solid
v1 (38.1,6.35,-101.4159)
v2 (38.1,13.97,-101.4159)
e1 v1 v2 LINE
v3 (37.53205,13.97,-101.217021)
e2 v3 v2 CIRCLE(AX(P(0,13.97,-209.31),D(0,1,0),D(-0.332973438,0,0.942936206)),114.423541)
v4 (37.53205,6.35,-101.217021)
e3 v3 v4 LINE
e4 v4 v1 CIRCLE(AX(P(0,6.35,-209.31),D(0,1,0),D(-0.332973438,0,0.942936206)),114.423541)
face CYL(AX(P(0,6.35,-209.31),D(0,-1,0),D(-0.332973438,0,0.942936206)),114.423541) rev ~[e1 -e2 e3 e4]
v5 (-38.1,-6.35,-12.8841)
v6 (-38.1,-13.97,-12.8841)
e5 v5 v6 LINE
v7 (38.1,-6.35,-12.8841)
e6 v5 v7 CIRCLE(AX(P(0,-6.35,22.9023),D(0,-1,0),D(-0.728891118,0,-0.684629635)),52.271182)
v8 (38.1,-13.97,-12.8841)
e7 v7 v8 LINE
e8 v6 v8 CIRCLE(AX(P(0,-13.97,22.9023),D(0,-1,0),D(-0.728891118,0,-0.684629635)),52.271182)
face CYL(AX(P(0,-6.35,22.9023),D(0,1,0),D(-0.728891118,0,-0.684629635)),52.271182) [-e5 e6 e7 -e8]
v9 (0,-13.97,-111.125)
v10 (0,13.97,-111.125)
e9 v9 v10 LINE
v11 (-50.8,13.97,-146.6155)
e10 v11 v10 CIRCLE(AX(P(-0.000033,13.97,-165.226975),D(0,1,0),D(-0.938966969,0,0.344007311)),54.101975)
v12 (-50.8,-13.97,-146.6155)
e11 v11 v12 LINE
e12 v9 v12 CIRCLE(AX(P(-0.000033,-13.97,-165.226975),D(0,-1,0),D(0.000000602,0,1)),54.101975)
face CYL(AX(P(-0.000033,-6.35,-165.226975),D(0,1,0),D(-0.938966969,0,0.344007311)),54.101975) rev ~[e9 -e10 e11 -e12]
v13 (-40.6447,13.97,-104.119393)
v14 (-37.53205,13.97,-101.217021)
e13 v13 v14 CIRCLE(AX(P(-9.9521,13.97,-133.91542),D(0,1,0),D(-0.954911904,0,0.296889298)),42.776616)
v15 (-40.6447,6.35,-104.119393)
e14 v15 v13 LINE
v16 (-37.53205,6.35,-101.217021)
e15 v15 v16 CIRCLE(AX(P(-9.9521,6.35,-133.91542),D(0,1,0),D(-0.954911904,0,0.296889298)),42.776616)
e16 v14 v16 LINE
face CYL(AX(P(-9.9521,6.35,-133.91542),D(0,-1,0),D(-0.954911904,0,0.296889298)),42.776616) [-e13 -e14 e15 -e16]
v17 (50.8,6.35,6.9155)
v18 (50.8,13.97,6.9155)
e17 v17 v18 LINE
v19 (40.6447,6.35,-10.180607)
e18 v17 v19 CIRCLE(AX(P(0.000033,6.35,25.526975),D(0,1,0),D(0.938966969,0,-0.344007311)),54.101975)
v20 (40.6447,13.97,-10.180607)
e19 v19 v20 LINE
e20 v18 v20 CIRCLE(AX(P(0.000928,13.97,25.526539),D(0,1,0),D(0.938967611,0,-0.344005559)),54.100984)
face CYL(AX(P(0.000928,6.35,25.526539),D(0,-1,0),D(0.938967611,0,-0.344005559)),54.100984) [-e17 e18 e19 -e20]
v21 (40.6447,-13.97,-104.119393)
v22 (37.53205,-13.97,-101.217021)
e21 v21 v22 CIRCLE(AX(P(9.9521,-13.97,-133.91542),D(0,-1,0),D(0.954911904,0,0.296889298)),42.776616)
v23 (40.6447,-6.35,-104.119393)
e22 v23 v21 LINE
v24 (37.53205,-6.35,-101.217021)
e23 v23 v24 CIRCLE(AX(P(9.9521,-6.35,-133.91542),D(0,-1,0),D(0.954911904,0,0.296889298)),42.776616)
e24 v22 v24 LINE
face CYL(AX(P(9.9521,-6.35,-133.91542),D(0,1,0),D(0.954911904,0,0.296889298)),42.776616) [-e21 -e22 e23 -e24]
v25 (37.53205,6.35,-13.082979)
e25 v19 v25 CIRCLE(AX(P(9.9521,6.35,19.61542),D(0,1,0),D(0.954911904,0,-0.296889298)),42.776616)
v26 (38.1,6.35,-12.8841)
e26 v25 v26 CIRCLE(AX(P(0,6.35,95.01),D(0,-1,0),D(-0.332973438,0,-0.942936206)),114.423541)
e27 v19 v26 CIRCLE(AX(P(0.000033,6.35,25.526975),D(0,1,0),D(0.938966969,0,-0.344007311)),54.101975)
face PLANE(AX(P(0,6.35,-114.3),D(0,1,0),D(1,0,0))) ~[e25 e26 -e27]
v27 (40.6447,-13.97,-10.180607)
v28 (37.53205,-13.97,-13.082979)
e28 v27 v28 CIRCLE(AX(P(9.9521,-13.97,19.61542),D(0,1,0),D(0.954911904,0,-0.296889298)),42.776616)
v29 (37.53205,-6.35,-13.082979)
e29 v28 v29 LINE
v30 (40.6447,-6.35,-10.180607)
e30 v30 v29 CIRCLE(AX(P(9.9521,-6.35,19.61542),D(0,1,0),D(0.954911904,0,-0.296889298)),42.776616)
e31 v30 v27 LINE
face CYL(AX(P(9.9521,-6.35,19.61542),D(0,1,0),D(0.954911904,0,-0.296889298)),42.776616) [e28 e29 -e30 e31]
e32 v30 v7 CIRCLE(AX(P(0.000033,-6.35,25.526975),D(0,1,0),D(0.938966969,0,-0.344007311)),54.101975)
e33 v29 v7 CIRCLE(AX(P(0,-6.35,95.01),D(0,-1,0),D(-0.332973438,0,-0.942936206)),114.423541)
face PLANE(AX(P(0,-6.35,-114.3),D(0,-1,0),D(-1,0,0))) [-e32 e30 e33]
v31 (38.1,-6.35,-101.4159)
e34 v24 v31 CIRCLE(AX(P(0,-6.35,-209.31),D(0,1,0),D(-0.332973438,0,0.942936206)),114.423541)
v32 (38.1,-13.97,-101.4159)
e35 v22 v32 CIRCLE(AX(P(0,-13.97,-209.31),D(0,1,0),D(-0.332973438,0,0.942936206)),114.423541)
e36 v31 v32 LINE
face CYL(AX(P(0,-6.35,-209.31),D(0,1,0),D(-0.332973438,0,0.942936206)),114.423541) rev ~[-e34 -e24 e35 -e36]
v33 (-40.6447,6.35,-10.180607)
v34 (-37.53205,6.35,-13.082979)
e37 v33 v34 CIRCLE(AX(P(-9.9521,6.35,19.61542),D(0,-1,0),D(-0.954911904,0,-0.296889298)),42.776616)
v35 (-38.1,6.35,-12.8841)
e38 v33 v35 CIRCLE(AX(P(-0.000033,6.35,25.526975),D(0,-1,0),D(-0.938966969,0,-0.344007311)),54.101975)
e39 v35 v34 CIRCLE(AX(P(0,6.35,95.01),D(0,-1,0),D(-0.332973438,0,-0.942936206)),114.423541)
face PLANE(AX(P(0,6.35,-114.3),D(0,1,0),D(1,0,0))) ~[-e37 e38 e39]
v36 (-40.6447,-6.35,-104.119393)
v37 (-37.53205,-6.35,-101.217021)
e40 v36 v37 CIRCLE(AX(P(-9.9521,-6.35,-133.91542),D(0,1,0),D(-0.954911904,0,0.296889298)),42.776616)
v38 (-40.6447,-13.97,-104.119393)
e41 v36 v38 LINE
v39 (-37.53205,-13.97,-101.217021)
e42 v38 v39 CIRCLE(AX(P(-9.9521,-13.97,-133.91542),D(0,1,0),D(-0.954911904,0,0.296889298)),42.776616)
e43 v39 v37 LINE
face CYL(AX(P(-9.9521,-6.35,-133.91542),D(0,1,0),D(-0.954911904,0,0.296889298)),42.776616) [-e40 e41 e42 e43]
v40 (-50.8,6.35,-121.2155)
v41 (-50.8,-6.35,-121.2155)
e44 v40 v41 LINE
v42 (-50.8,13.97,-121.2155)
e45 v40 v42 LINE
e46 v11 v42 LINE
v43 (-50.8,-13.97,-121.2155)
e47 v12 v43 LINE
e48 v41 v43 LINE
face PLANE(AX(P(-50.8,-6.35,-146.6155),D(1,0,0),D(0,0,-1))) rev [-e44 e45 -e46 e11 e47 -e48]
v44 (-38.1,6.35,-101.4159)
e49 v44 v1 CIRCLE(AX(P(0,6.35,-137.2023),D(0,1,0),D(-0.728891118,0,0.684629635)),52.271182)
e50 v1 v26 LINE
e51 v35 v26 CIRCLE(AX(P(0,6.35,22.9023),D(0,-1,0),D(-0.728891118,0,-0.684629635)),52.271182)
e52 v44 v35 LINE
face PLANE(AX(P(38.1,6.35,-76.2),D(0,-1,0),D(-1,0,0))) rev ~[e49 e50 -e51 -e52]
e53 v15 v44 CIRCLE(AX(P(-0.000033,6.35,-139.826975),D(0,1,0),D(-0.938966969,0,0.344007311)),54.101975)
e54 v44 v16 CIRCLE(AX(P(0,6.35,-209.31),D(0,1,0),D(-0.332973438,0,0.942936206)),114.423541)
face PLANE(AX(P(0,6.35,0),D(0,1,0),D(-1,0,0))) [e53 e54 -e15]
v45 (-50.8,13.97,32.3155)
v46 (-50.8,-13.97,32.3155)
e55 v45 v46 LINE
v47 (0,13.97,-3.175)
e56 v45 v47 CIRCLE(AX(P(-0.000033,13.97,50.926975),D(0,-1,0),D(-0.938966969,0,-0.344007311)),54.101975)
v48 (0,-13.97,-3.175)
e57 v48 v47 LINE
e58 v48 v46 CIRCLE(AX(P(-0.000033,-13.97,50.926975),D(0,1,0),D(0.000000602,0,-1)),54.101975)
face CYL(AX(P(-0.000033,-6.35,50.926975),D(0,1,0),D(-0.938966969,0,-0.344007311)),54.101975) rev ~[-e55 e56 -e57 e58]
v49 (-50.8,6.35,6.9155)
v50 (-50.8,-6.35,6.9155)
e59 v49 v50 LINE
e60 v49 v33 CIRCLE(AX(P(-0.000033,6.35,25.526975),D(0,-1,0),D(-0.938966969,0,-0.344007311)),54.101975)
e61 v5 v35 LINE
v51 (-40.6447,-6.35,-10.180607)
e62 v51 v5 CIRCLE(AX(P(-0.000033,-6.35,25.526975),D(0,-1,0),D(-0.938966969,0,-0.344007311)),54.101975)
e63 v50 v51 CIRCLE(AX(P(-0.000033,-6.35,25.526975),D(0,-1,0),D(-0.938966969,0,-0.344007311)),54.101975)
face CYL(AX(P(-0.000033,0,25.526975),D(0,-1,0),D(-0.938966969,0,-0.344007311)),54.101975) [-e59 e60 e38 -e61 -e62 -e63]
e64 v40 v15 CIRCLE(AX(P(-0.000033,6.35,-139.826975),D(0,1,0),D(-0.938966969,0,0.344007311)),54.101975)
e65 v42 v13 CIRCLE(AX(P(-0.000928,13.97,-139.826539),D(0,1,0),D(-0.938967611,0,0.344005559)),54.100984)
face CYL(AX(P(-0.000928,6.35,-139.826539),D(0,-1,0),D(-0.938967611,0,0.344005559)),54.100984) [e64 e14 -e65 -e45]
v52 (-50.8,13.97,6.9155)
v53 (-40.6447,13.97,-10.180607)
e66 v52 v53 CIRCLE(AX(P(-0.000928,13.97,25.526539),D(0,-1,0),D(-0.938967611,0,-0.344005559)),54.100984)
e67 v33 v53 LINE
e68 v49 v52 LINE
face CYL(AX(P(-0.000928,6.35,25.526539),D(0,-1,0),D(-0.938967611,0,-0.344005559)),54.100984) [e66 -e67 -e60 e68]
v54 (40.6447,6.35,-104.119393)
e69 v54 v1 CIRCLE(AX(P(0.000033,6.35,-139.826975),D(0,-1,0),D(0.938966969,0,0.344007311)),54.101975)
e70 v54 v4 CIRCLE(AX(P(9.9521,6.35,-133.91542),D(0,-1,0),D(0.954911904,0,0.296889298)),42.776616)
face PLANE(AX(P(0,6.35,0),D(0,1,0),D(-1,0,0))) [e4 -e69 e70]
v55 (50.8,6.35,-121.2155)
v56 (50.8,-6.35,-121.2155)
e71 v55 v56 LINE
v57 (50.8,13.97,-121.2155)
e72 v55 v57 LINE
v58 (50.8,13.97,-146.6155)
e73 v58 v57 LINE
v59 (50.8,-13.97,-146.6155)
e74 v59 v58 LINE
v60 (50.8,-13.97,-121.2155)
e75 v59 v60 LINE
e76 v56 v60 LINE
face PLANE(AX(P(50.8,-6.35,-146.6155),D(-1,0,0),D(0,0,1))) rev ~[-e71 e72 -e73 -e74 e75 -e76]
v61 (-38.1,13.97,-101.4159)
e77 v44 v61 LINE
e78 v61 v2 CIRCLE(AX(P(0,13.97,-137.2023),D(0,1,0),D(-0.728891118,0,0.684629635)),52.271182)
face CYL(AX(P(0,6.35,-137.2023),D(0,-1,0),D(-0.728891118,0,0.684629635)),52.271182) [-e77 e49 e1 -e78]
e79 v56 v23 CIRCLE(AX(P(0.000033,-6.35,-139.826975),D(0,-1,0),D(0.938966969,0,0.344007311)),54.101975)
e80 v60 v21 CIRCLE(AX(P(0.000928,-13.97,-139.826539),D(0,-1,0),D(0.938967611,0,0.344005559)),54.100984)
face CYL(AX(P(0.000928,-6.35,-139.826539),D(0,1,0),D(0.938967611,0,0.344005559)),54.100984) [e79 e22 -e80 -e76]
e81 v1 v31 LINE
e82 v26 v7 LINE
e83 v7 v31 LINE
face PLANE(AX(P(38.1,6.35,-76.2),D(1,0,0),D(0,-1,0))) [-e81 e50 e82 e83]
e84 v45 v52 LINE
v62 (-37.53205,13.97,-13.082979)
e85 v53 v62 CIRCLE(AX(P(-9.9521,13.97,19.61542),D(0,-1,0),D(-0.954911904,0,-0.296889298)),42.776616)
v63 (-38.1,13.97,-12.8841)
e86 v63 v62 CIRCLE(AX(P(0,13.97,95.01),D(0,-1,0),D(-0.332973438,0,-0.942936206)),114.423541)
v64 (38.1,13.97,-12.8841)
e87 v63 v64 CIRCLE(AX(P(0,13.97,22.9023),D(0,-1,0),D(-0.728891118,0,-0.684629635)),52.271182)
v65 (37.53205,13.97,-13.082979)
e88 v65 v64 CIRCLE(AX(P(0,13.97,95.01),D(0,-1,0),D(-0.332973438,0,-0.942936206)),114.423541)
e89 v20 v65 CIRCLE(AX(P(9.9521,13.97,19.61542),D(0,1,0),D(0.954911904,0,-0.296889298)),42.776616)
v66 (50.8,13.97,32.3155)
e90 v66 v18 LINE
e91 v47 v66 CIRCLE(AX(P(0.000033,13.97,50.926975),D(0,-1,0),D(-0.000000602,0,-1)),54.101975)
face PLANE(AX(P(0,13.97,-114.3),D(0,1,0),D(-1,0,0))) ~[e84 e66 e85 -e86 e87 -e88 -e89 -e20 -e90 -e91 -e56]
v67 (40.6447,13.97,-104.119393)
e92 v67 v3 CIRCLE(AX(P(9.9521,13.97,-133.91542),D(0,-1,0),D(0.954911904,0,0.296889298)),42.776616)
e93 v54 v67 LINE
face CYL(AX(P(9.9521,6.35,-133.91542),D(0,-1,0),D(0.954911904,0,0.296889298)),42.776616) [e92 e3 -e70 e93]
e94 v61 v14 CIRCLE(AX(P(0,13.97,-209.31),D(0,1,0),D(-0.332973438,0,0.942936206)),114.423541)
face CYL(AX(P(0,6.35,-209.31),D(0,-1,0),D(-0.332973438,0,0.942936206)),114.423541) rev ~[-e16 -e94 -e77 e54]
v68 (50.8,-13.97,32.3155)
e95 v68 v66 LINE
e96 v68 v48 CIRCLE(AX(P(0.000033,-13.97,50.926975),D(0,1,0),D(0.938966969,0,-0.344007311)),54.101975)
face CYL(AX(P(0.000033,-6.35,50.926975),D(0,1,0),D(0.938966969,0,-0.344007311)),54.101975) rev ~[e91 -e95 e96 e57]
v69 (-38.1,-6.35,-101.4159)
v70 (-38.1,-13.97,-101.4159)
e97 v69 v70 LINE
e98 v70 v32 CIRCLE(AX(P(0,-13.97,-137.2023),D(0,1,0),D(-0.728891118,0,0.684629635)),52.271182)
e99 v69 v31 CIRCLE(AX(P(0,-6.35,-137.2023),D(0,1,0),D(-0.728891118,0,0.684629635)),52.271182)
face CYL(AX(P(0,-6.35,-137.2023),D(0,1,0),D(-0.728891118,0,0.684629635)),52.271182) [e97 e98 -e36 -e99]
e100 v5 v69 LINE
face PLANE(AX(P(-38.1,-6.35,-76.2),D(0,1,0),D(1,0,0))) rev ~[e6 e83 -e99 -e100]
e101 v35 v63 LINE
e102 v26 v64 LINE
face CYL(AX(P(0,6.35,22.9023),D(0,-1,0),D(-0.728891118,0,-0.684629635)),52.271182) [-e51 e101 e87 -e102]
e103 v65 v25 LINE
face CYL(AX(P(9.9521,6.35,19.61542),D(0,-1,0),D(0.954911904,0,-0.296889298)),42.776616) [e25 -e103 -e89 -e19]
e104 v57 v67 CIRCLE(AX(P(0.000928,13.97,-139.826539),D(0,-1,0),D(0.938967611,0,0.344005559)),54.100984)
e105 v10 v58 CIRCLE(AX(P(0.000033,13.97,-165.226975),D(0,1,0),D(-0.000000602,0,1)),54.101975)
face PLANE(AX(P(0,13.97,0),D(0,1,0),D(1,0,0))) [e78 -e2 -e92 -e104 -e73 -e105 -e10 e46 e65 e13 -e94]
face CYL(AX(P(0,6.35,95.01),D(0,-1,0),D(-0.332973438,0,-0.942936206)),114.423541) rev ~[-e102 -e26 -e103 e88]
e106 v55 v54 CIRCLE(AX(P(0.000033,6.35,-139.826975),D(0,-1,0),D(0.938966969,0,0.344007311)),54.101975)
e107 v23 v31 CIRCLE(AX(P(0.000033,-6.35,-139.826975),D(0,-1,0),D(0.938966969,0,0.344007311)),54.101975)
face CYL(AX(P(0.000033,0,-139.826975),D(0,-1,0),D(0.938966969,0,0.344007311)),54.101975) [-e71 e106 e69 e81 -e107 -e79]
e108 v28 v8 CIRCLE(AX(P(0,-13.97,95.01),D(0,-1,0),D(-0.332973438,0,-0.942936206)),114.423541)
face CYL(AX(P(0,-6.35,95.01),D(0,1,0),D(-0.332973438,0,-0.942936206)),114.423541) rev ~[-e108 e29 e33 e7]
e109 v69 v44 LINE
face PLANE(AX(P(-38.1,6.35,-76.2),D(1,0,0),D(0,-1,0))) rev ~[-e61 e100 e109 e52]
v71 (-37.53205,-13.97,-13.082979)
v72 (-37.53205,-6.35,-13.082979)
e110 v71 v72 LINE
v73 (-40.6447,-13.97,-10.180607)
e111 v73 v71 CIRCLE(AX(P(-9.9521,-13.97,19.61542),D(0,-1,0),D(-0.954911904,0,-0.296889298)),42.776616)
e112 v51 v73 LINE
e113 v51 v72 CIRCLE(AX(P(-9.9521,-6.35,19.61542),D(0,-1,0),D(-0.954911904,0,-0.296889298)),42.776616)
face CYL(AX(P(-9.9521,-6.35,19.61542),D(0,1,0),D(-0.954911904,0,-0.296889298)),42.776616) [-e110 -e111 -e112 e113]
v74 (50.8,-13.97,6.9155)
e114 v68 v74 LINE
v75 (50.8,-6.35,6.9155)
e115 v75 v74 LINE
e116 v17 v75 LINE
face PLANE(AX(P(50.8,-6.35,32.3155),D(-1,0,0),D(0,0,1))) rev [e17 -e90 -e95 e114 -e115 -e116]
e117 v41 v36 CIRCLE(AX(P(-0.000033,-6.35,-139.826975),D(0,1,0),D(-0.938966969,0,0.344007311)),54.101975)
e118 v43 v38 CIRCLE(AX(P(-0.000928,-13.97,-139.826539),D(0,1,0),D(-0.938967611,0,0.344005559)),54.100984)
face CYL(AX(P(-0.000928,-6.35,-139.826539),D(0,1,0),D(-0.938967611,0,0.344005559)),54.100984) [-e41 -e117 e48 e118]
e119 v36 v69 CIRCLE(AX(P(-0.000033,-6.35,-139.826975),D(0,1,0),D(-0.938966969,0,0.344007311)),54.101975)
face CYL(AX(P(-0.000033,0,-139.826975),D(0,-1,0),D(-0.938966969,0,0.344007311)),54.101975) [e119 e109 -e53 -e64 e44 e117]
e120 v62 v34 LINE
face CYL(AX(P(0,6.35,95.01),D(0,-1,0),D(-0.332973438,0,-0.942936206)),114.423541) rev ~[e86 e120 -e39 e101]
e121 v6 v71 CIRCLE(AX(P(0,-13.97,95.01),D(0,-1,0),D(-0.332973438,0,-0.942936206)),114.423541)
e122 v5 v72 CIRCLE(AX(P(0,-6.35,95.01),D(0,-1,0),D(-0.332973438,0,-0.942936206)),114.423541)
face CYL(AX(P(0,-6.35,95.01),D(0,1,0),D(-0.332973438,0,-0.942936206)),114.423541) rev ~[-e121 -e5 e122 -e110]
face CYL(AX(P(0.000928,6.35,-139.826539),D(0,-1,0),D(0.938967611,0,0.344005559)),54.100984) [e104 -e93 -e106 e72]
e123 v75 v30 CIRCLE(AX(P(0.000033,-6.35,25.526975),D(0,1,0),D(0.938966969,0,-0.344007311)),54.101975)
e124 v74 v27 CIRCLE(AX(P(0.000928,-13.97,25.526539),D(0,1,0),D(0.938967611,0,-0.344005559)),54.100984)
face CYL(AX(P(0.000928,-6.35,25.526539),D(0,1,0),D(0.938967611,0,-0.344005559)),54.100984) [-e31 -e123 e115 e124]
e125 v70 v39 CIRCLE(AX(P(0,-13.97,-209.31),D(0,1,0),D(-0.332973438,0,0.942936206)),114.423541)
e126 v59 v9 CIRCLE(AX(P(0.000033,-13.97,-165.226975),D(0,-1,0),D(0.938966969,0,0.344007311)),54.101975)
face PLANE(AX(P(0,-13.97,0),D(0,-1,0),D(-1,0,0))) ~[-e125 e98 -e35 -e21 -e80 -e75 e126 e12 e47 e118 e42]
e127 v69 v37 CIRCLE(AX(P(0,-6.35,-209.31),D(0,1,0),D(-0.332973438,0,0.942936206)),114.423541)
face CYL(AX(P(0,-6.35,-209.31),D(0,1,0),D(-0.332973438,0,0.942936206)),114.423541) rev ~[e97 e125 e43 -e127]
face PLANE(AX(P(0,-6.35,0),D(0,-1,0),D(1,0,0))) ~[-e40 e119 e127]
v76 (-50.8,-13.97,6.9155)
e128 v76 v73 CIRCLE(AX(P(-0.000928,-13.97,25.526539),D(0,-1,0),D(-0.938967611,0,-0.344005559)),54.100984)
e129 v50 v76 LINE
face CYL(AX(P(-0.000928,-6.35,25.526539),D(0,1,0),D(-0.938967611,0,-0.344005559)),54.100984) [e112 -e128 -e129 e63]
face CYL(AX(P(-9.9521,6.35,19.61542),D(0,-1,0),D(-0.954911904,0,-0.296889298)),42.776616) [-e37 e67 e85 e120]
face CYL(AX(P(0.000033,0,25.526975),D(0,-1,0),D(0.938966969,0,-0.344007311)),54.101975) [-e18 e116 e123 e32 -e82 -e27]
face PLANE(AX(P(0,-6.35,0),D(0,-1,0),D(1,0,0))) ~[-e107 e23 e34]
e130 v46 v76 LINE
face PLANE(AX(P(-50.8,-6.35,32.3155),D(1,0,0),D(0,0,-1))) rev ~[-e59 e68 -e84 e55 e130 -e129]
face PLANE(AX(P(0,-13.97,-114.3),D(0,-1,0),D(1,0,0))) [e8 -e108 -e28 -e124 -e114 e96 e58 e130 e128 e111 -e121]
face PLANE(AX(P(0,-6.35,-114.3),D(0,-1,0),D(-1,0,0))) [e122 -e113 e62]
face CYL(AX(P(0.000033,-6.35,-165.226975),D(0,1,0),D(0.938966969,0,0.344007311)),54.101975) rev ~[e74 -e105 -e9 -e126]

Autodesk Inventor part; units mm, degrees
ref_plane "YZ Plane" through (0, 0, 0) normal (1, 0, 0) x (0, 1, 0)
ref_plane "XZ Plane" through (0, 0, 0) normal (0, 1, 0) x (-1, 0, 0)
ref_plane "XY Plane" through (0, 0, 0) normal (0, 0, 1) x (1, 0, 0)
sketch "Sketch1" plane through (0, 0, 0) normal (0, 1, 0) x (-1, 0, 0)
  point P0 (0, 0)
sketch "Sketch2" plane through (0, 0, 0) normal (0, 1, 0) x (-1, 0, 0)
  line L0 (0, 0) -> (38.1, 0)
  line L1 (38.1, 0) -> (38.1, -84.0465)
  arc A0 (50.8, -121.2155) -> (0, -85.725) centre (0, -139.827) ccw
  line L2 (38.1, -84.0465) -> (38.1, -101.4159)
  arc A1 (50.8, -146.6155) -> (0, -111.125) centre (0, -165.227) ccw
  line L3 (50.8, -121.2155) -> (50.8, -146.6155)
  line L4 (0, 0) -> (0, -111.125)
sketch "Sketch3" plane through (0, 0, 0) normal (0, 1, 0) x (-1, 0, 0)
  point P0 (0, 0)
  point P1 (0, 0)
  point P2 (16.5768, 0)
  point P3 (25.4, 0)
  point P4 (0, 0)
  dimension "d10" = 25.4
extrude "Extrusion1" add sketch "Sketch2" along normal blind 6.35
sketch "Sketch4" plane through (0, 6.35, 0) normal (0, 1, 0) x (1, 0, 0)
  arc A0 (-50.8, 121.2155) -> (-38.1, 101.4159) centre (0, 139.827) ccw projected
  arc A1 (-50.8, 146.6155) -> (0, 111.125) centre (0, 165.227) ccw projected
  line L0 (-50.8, 146.6155) -> (-50.8, 121.2155) projected
  line L1 (-50.8, 121.2155) -> (-50.8, 146.6155)
  line L2 (0, 111.125) -> (0, 92.3126)
  line L3 (0, 0) -> (0, 111.125) projected
  arc A2 (-42.5277, 131.7842) -> (0, 111.125) centre (0, 165.227) ccw
  arc A3 (-50.8, 121.2155) -> (0, 92.3126) centre (-9.952, 133.9155) ccw
  arc A4 (-50.8, 146.6155) -> (-44.1205, 133.9155) centre (0, 165.227) ccw
  arc A5 (-50.8, 146.6155) -> (0, 111.125) centre (0, 165.227) ccw
  point P0 (-40.6454, 104.1202)
extrude "Extrusion2" add sketch "Sketch4" along normal blind 7.62 contours L0 A1 L2 A3 A0
mirror "Mirror1" about plane through (0, 0, 0) normal (1, 0, 0) of "Extrusion1", "Extrusion2"
sketch "Sketch5" plane through (0, 6.35, 0) normal (0, 1, 0) x (1, 0, 0)
  arc A0 (38.1, 101.4159) -> (50.8, 121.2155) centre (0, 139.827) ccw projected
  arc A1 (-38.1, 101.4159) -> (38.1, 101.4159) centre (0, 137.2023) ccw
  line L0 (-38.1, 101.4159) -> (-38.1, 0) projected
  arc A2 (-38.1, 101.4159) -> (38.1, 101.4159) centre (0, 209.31) ccw
  point P0 (0, 0)
extrude "Extrusion3" add sketch "Sketch5" along normal blind 7.62
mirror "Mirror2" about plane through (0, 0, 0) normal (0, 1, 0) of "Extrusion1", "Extrusion2", "Mirror1", "Extrusion3"
sketch "Sketch6" plane through (0, 6.35, 0) normal (0, 1, 0) x (1, 0, 0)
  line L0 (-38.1, 101.4159) -> (-38.1, 0) projected
  line L1 (38.1, 101.4159) -> (38.1, 0) projected
  line L2 (-38.1, -38.1) -> (38.1, -38.1)
  line L3 (38.1, -38.1) -> (38.1, 38.1)
  line L4 (38.1, 38.1) -> (-38.1, 38.1)
  line L5 (-38.1, 38.1) -> (-38.1, -38.1)
  point P0 (0, 0)
  point P1 (-38.1, -101.4159)
  point P2 (-38.1, 38.1)
  point P3 (38.1, -101.4159)
  point P4 (-38.1, 0)
  dimension "d17" = 38.1
  dimension "d18" = 38.1
extrude "Extrusion4" cut sketch "Sketch6" against normal through all
sketch "Sketch7" plane through (0, -6.35, -137.2023) normal (0, -1, 0) x (1, 0, 0)
  point P0 (0, 137.2023)
sketch "Sketch8" plane through (-38.1, 6.35, -38.1) normal (0, 0, 1) x (1, 0, 0)
  line L0 (0, 0) -> (76.2, 0) projected
  line L1 (76.2, -12.7) -> (76.2, -20.32) projected
  line L2 (0, 0) -> (76.2, 0)
  line L3 (76.2, 0) -> (76.2, -12.7)
  line L4 (76.2, -12.7) -> (0, -12.7)
  line L5 (0, -12.7) -> (0, 0)
  point P0 (38.1, -6.35)
extrude "Extrusion5" cut sketch "Sketch8" against normal blind 12.7
sketch "Sketch9" plane through (-38.1, 6.35, -50.8) normal (0, 0, 1) x (1, 0, 0)
  line L0 (0, 0) -> (76.2, 0) projected
  line L1 (76.2, 0) -> (76.2, -12.7) projected
  line L2 (0, 0) -> (76.2, 0)
  line L3 (76.2, 0) -> (76.2, -12.7)
  line L4 (76.2, -12.7) -> (0, -12.7)
  line L5 (0, -12.7) -> (0, 0)
  point P0 (38.1, -6.35)
extrude "Extrusion6" cut sketch "Sketch9" against normal blind 25.4
sketch "Sketch10" plane through (38.1, -6.35, -101.4159) normal (1, 0, 0) x (0, 0, -1)
  point P0 (-101.4159, 6.35)
sketch "Sketch11" plane through (-38.1, 6.35, -76.2) normal (0, 0, 1) x (1, 0, 0)
  line L0 (0, -12.7) -> (-2.5454, -12.7) projected
  line L1 (76.2, 0) -> (76.2, -12.7) projected
  line L2 (0, -12.7) -> (76.2, -12.7)
  line L3 (76.2, -12.7) -> (76.2, 0)
  line L4 (76.2, 0) -> (0, 0)
  line L5 (0, 0) -> (0, -12.7)
  point P0 (38.1, -6.35)
extrude "Extrusion7" add sketch "Sketch11" along normal blind 19.05
mirror "Mirror4" about plane through (0, 0, -57.15) normal (0, 0, 1)
sketch "Sketch12" plane through (0, 13.97, 50.927) normal (0, 1, 0) x (1, 0, 0)
  point P0 (0, 50.927)
properties part number "dc motor holder 2" material "Iron, Ductile"
